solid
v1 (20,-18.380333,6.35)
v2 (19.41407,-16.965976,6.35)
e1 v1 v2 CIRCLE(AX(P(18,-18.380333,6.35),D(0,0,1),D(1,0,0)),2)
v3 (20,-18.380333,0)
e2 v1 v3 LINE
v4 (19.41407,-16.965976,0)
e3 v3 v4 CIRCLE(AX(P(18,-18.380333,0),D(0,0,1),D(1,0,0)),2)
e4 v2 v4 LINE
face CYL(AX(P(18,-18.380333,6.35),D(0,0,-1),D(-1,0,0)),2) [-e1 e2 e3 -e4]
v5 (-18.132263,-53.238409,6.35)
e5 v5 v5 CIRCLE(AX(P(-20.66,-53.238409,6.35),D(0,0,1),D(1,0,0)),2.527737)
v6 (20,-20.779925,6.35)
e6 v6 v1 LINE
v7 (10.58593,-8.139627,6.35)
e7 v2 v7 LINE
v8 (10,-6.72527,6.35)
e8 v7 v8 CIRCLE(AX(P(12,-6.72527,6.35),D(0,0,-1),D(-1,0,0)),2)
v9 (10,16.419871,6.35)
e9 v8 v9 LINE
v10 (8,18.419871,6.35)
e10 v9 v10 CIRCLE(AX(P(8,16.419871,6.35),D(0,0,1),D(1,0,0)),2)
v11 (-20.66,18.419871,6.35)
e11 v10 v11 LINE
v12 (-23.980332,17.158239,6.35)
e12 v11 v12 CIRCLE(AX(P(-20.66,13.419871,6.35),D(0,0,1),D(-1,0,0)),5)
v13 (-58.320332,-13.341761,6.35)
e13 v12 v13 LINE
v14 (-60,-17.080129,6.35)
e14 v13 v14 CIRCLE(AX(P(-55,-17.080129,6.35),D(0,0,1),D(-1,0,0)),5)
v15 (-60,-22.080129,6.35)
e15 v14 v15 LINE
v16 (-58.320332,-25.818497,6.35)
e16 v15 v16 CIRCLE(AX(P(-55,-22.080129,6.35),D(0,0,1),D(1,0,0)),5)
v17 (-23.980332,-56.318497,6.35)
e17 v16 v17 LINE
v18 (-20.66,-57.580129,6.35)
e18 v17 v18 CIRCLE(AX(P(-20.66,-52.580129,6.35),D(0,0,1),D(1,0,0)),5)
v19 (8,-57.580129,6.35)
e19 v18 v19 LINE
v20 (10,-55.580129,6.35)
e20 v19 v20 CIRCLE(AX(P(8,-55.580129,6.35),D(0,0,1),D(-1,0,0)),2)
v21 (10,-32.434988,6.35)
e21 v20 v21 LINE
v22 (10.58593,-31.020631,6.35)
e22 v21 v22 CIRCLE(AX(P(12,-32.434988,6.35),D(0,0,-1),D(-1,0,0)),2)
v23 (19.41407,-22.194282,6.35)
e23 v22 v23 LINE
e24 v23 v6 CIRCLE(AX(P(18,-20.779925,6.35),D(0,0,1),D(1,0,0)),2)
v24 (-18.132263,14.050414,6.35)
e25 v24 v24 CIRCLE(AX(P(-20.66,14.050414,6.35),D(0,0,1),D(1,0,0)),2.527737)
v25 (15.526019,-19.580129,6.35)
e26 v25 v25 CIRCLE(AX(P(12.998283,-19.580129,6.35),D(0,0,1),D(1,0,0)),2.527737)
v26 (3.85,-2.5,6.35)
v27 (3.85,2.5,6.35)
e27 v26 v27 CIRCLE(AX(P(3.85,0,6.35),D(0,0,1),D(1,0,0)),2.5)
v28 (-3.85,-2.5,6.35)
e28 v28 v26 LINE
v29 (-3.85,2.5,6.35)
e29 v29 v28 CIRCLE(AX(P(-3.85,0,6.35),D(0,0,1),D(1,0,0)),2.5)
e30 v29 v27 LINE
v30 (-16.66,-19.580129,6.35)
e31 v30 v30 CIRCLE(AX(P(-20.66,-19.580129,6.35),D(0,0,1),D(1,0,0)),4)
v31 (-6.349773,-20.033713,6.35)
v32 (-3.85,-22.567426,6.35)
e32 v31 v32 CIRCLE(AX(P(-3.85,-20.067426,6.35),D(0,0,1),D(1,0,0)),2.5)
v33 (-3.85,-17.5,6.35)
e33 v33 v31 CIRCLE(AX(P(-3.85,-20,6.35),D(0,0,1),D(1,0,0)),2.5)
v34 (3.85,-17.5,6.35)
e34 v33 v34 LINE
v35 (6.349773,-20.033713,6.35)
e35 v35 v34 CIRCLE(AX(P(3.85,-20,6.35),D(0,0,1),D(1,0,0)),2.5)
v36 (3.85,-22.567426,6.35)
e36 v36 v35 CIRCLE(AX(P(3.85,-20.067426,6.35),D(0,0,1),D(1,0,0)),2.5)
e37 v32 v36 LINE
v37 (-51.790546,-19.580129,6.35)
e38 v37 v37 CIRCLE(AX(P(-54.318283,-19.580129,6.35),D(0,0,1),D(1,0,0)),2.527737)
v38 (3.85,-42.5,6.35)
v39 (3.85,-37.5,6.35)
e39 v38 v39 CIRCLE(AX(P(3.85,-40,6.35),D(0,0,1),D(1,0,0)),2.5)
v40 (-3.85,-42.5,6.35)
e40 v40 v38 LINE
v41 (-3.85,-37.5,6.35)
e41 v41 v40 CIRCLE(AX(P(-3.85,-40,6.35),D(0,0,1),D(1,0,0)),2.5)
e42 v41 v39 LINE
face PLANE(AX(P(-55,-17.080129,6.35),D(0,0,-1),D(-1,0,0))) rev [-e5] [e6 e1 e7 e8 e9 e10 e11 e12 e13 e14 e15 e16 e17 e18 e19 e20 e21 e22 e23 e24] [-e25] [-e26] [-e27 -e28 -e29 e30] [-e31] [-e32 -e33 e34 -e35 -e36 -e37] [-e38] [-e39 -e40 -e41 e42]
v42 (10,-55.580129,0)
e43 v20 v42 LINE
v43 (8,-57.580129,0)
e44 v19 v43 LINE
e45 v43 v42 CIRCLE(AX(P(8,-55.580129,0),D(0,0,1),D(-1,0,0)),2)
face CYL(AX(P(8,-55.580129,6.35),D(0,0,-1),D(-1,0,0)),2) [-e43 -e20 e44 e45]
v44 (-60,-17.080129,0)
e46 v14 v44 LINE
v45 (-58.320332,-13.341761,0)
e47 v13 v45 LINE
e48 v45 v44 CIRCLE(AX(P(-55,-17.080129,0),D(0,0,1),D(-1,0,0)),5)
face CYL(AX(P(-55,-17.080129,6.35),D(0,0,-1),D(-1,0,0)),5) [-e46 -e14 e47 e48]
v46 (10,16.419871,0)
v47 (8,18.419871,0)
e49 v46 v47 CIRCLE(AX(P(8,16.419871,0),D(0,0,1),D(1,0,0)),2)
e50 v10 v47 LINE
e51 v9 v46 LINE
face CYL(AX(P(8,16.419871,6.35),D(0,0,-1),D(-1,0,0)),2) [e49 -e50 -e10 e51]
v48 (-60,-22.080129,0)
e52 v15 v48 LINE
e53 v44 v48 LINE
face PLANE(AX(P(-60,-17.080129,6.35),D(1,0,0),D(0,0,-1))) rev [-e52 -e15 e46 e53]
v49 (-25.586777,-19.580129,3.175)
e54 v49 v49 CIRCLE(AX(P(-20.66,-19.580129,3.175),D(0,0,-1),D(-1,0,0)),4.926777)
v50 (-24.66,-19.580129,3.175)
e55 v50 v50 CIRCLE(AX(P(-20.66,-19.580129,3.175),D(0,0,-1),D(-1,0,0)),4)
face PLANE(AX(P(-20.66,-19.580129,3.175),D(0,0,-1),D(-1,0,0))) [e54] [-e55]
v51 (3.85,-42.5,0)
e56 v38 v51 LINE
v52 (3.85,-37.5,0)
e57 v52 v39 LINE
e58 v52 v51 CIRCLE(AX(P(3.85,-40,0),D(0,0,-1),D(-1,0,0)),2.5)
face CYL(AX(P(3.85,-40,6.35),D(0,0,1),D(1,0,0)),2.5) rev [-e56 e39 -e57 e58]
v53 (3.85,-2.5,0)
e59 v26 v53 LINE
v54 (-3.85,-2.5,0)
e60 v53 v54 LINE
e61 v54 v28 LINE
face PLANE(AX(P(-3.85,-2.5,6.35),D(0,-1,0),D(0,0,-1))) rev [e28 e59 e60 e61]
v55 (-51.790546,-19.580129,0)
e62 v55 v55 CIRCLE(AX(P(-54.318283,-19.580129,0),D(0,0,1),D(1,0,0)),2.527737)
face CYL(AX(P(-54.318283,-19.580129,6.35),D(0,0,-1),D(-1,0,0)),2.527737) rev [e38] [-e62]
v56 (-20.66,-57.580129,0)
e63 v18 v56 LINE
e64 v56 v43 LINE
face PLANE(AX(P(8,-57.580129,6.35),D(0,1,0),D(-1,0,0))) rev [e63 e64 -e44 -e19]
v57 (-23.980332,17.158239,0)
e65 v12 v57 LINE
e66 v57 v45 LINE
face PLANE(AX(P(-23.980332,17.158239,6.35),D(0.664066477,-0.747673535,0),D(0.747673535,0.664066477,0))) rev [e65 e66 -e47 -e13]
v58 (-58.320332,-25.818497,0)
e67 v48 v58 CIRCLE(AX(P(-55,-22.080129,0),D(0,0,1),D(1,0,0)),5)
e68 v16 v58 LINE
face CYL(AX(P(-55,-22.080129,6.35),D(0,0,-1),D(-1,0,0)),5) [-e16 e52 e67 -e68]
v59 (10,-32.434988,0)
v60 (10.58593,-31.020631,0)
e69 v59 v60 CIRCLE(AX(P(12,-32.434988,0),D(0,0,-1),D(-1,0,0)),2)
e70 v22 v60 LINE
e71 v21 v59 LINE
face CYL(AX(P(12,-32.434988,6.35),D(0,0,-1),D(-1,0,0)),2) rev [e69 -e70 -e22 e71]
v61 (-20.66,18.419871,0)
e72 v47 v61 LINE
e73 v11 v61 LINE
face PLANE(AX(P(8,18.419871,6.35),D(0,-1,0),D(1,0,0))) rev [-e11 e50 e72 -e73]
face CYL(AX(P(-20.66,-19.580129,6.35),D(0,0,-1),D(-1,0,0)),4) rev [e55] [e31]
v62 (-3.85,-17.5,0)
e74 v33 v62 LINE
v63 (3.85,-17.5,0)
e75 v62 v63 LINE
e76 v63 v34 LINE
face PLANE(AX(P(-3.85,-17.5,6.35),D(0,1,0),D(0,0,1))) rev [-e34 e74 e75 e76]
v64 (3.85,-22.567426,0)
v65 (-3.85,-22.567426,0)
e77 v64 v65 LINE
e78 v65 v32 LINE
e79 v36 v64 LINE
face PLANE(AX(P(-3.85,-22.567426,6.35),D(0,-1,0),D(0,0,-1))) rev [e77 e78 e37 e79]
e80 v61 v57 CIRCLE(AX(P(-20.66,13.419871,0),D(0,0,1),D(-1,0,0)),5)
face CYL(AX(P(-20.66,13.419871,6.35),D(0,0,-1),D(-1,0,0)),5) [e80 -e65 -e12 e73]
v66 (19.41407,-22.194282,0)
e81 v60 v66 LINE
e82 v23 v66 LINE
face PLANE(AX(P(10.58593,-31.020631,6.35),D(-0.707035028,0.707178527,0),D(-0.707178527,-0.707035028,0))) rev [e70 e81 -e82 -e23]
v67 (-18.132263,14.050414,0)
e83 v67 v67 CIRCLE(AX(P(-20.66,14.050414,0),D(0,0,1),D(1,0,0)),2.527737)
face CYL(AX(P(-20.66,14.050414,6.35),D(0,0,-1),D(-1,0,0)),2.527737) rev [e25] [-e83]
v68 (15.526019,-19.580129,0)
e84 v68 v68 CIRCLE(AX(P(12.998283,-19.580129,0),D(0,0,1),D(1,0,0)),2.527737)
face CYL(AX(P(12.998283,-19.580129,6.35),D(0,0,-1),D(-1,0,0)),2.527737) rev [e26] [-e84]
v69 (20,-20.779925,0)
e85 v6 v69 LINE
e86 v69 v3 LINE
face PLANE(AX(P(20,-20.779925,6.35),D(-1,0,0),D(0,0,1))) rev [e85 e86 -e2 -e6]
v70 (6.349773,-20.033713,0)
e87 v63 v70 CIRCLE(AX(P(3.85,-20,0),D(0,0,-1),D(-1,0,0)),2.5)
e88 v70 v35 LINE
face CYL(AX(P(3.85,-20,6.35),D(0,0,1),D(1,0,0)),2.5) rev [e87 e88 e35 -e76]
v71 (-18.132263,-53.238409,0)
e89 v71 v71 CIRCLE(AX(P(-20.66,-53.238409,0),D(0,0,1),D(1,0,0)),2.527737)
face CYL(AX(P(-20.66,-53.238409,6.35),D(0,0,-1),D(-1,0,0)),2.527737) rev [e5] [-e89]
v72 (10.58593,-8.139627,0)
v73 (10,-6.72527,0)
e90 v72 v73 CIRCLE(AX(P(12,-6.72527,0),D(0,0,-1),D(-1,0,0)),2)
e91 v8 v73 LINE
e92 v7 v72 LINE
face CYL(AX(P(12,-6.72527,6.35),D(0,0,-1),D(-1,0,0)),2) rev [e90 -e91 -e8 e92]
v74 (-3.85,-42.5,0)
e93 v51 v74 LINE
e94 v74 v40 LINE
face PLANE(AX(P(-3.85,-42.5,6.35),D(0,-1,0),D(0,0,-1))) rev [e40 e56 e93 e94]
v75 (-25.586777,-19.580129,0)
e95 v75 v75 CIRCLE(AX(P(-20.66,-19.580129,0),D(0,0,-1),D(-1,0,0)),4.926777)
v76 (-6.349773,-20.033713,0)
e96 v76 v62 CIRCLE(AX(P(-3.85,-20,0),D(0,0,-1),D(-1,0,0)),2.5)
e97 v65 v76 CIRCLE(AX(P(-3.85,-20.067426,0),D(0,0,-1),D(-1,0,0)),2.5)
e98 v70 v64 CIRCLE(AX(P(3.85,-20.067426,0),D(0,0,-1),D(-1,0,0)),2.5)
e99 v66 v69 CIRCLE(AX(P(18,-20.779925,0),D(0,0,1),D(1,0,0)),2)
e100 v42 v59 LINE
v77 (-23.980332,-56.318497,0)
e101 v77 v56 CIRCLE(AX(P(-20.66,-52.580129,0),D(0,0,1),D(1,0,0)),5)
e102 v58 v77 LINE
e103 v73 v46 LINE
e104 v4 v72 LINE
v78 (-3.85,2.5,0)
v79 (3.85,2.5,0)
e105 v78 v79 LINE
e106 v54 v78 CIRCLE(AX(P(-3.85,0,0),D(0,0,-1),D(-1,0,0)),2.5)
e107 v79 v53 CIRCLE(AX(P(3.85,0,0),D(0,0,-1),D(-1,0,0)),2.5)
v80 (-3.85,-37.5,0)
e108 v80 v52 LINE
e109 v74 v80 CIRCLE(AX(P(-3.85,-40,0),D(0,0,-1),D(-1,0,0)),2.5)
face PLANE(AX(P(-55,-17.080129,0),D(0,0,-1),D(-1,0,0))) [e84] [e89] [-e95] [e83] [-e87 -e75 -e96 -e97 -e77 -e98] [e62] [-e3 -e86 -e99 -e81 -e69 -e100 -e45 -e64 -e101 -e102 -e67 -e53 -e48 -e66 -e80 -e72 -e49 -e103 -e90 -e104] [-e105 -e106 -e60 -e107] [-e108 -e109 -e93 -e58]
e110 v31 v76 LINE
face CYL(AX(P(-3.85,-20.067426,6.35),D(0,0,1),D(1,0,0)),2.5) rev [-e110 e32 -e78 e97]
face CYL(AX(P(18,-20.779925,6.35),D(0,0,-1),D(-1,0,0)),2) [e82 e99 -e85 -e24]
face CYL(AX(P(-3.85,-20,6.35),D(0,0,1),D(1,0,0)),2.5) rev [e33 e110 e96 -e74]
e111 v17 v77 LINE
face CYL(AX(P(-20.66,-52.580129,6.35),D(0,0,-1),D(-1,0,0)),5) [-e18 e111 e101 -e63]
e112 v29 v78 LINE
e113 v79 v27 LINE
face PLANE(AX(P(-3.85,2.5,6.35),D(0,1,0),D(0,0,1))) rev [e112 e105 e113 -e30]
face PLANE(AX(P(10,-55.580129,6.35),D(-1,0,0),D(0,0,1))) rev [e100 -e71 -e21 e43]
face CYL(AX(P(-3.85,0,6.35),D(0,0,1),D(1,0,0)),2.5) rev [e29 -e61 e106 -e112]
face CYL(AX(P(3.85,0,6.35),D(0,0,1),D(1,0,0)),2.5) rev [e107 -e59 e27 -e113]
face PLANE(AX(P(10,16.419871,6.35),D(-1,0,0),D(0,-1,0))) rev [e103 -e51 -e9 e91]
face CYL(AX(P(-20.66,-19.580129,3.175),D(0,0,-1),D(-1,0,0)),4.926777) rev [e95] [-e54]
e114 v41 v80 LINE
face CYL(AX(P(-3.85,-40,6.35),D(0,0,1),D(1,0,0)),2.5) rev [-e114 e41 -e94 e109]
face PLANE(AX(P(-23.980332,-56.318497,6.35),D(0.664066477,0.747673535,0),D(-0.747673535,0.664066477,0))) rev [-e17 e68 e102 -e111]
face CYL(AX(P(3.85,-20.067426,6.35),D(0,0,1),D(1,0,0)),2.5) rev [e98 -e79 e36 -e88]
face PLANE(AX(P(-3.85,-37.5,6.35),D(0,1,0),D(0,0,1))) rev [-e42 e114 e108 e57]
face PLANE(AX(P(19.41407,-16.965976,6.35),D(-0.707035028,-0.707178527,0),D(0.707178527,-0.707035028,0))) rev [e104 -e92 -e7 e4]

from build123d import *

# Parameters (mm, degrees)
SKETCH1_R                 = 4
SKETCH1_R_2               = 2.527736539
BOSS_EXTRUDE1_DEPTH       = 6.35
F_5_0MM_DOWEL_SLOT1_DEPTH = 6.35
SKETCH4_R                 = 4.926776695
CUT_EXTRUDE1_DEPTH        = 3.175


# Read off the part's stored shape, not the designer's step: Ø5.0mm Dowel Slot1
with BuildPart() as part:
    # Sketch1 → Boss-Extrude1 (new body)
    with BuildSketch(Plane.XY):
        with BuildLine():
            Line((8, -57.58012907), (-20.66, -57.58012907))
            ThreePointArc((-20.66, -57.58012907), (-22.435973202, -57.254090899), (-23.980332383, -56.318496743))
            Line((-23.980332383, -56.318496743), (-58.320332383, -25.818496743))
            ThreePointArc((-58.320332383, -25.818496743), (-59.560792799, -24.12931648), (-60, -22.08012907))
            Line((-60, -22.08012907), (-60, -17.08012907))
            ThreePointArc((-60, -17.08012907), (-59.560792799, -15.03094166), (-58.320332383, -13.341761396))
            Line((-58.320332383, -13.341761396), (-23.980332383, 17.158238604))
            ThreePointArc((-23.980332383, 17.158238604), (-22.435973202, 18.09383276), (-20.66, 18.41987093))
            Line((-20.66, 18.41987093), (8, 18.41987093))
            ThreePointArc((8, 18.41987093), (9.414213562, 17.834084493), (10, 16.41987093))
            Line((10, 16.41987093), (10, -6.725270109))
            ThreePointArc((10, -6.725270109), (10.152279768, -7.490730718), (10.585929943, -8.139627163))
            Line((10.585929943, -8.139627163), (19.414070057, -16.965975896))
            ThreePointArc((19.414070057, -16.965975896), (19.847720232, -17.614872341), (20, -18.38033295))
            Line((20, -18.38033295), (20, -20.77992519))
            ThreePointArc((20, -20.77992519), (19.847720232, -21.545385798), (19.414070057, -22.194282243))
            Line((19.414070057, -22.194282243), (10.585929943, -31.020630977))
            ThreePointArc((10.585929943, -31.020630977), (10.152279768, -31.669527422), (10, -32.43498803))
            Line((10, -32.43498803), (10, -55.58012907))
            ThreePointArc((10, -55.58012907), (9.414213562, -56.994342632), (8, -57.58012907))
        make_face()
        with Locations((-20.66, -19.58012907)):
            Circle(SKETCH1_R, mode=Mode.SUBTRACT)
        with Locations((-54.318282784, -19.58012907)):
            Circle(SKETCH1_R_2, mode=Mode.SUBTRACT)
        with Locations((-20.66, 14.050414337)):
            Circle(SKETCH1_R_2, mode=Mode.SUBTRACT)
        with Locations((12.998282784, -19.58012907)):
            Circle(SKETCH1_R_2, mode=Mode.SUBTRACT)
        with Locations((-20.66, -53.238409212)):
            Circle(SKETCH1_R_2, mode=Mode.SUBTRACT)
    extrude(amount=BOSS_EXTRUDE1_DEPTH)

    # Ø5.0mm Dowel Slot1 outline → Ø5.0mm Dowel Slot1 (cut)
    with BuildSketch(Plane.XY):
        with BuildLine():
            ThreePointArc((3.85, -22.567426083), (5.629646398, -21.823233219), (6.349772676, -20.033713042))
            ThreePointArc((6.349772676, -20.033713042), (5.629646398, -18.244192864), (3.85, -17.5))
            Line((3.85, -17.5), (-3.85, -17.5))
            ThreePointArc((-3.85, -17.5), (-5.629646398, -18.244192864), (-6.349772676, -20.033713042))
            ThreePointArc((-6.349772676, -20.033713042), (-5.629646398, -21.823233219), (-3.85, -22.567426083))
            Line((-3.85, -22.567426083), (3.85, -22.567426083))
        make_face()
        with BuildLine():
            Line((-3.85, -2.5), (3.85, -2.5))
            ThreePointArc((3.85, -2.5), (6.35, 0), (3.85, 2.5))
            Line((3.85, 2.5), (-3.85, 2.5))
            ThreePointArc((-3.85, 2.5), (-6.35, 0), (-3.85, -2.5))
        make_face()
        with BuildLine():
            Line((-3.85, -42.5), (3.85, -42.5))
            ThreePointArc((3.85, -42.5), (6.35, -40), (3.85, -37.5))
            Line((3.85, -37.5), (-3.85, -37.5))
            ThreePointArc((-3.85, -37.5), (-6.35, -40), (-3.85, -42.5))
        make_face()
    extrude(amount=F_5_0MM_DOWEL_SLOT1_DEPTH, mode=Mode.SUBTRACT)

    # Sketch4 → Cut-Extrude1 (cut)
    with BuildSketch(Plane(origin=(0, 0, 0), x_dir=(-1, 0, 0), z_dir=(0, 0, -1))):
        with Locations((20.66, -19.58012907)):
            Circle(SKETCH4_R)
    extrude(amount=-CUT_EXTRUDE1_DEPTH, mode=Mode.SUBTRACT)


solid = part.part
